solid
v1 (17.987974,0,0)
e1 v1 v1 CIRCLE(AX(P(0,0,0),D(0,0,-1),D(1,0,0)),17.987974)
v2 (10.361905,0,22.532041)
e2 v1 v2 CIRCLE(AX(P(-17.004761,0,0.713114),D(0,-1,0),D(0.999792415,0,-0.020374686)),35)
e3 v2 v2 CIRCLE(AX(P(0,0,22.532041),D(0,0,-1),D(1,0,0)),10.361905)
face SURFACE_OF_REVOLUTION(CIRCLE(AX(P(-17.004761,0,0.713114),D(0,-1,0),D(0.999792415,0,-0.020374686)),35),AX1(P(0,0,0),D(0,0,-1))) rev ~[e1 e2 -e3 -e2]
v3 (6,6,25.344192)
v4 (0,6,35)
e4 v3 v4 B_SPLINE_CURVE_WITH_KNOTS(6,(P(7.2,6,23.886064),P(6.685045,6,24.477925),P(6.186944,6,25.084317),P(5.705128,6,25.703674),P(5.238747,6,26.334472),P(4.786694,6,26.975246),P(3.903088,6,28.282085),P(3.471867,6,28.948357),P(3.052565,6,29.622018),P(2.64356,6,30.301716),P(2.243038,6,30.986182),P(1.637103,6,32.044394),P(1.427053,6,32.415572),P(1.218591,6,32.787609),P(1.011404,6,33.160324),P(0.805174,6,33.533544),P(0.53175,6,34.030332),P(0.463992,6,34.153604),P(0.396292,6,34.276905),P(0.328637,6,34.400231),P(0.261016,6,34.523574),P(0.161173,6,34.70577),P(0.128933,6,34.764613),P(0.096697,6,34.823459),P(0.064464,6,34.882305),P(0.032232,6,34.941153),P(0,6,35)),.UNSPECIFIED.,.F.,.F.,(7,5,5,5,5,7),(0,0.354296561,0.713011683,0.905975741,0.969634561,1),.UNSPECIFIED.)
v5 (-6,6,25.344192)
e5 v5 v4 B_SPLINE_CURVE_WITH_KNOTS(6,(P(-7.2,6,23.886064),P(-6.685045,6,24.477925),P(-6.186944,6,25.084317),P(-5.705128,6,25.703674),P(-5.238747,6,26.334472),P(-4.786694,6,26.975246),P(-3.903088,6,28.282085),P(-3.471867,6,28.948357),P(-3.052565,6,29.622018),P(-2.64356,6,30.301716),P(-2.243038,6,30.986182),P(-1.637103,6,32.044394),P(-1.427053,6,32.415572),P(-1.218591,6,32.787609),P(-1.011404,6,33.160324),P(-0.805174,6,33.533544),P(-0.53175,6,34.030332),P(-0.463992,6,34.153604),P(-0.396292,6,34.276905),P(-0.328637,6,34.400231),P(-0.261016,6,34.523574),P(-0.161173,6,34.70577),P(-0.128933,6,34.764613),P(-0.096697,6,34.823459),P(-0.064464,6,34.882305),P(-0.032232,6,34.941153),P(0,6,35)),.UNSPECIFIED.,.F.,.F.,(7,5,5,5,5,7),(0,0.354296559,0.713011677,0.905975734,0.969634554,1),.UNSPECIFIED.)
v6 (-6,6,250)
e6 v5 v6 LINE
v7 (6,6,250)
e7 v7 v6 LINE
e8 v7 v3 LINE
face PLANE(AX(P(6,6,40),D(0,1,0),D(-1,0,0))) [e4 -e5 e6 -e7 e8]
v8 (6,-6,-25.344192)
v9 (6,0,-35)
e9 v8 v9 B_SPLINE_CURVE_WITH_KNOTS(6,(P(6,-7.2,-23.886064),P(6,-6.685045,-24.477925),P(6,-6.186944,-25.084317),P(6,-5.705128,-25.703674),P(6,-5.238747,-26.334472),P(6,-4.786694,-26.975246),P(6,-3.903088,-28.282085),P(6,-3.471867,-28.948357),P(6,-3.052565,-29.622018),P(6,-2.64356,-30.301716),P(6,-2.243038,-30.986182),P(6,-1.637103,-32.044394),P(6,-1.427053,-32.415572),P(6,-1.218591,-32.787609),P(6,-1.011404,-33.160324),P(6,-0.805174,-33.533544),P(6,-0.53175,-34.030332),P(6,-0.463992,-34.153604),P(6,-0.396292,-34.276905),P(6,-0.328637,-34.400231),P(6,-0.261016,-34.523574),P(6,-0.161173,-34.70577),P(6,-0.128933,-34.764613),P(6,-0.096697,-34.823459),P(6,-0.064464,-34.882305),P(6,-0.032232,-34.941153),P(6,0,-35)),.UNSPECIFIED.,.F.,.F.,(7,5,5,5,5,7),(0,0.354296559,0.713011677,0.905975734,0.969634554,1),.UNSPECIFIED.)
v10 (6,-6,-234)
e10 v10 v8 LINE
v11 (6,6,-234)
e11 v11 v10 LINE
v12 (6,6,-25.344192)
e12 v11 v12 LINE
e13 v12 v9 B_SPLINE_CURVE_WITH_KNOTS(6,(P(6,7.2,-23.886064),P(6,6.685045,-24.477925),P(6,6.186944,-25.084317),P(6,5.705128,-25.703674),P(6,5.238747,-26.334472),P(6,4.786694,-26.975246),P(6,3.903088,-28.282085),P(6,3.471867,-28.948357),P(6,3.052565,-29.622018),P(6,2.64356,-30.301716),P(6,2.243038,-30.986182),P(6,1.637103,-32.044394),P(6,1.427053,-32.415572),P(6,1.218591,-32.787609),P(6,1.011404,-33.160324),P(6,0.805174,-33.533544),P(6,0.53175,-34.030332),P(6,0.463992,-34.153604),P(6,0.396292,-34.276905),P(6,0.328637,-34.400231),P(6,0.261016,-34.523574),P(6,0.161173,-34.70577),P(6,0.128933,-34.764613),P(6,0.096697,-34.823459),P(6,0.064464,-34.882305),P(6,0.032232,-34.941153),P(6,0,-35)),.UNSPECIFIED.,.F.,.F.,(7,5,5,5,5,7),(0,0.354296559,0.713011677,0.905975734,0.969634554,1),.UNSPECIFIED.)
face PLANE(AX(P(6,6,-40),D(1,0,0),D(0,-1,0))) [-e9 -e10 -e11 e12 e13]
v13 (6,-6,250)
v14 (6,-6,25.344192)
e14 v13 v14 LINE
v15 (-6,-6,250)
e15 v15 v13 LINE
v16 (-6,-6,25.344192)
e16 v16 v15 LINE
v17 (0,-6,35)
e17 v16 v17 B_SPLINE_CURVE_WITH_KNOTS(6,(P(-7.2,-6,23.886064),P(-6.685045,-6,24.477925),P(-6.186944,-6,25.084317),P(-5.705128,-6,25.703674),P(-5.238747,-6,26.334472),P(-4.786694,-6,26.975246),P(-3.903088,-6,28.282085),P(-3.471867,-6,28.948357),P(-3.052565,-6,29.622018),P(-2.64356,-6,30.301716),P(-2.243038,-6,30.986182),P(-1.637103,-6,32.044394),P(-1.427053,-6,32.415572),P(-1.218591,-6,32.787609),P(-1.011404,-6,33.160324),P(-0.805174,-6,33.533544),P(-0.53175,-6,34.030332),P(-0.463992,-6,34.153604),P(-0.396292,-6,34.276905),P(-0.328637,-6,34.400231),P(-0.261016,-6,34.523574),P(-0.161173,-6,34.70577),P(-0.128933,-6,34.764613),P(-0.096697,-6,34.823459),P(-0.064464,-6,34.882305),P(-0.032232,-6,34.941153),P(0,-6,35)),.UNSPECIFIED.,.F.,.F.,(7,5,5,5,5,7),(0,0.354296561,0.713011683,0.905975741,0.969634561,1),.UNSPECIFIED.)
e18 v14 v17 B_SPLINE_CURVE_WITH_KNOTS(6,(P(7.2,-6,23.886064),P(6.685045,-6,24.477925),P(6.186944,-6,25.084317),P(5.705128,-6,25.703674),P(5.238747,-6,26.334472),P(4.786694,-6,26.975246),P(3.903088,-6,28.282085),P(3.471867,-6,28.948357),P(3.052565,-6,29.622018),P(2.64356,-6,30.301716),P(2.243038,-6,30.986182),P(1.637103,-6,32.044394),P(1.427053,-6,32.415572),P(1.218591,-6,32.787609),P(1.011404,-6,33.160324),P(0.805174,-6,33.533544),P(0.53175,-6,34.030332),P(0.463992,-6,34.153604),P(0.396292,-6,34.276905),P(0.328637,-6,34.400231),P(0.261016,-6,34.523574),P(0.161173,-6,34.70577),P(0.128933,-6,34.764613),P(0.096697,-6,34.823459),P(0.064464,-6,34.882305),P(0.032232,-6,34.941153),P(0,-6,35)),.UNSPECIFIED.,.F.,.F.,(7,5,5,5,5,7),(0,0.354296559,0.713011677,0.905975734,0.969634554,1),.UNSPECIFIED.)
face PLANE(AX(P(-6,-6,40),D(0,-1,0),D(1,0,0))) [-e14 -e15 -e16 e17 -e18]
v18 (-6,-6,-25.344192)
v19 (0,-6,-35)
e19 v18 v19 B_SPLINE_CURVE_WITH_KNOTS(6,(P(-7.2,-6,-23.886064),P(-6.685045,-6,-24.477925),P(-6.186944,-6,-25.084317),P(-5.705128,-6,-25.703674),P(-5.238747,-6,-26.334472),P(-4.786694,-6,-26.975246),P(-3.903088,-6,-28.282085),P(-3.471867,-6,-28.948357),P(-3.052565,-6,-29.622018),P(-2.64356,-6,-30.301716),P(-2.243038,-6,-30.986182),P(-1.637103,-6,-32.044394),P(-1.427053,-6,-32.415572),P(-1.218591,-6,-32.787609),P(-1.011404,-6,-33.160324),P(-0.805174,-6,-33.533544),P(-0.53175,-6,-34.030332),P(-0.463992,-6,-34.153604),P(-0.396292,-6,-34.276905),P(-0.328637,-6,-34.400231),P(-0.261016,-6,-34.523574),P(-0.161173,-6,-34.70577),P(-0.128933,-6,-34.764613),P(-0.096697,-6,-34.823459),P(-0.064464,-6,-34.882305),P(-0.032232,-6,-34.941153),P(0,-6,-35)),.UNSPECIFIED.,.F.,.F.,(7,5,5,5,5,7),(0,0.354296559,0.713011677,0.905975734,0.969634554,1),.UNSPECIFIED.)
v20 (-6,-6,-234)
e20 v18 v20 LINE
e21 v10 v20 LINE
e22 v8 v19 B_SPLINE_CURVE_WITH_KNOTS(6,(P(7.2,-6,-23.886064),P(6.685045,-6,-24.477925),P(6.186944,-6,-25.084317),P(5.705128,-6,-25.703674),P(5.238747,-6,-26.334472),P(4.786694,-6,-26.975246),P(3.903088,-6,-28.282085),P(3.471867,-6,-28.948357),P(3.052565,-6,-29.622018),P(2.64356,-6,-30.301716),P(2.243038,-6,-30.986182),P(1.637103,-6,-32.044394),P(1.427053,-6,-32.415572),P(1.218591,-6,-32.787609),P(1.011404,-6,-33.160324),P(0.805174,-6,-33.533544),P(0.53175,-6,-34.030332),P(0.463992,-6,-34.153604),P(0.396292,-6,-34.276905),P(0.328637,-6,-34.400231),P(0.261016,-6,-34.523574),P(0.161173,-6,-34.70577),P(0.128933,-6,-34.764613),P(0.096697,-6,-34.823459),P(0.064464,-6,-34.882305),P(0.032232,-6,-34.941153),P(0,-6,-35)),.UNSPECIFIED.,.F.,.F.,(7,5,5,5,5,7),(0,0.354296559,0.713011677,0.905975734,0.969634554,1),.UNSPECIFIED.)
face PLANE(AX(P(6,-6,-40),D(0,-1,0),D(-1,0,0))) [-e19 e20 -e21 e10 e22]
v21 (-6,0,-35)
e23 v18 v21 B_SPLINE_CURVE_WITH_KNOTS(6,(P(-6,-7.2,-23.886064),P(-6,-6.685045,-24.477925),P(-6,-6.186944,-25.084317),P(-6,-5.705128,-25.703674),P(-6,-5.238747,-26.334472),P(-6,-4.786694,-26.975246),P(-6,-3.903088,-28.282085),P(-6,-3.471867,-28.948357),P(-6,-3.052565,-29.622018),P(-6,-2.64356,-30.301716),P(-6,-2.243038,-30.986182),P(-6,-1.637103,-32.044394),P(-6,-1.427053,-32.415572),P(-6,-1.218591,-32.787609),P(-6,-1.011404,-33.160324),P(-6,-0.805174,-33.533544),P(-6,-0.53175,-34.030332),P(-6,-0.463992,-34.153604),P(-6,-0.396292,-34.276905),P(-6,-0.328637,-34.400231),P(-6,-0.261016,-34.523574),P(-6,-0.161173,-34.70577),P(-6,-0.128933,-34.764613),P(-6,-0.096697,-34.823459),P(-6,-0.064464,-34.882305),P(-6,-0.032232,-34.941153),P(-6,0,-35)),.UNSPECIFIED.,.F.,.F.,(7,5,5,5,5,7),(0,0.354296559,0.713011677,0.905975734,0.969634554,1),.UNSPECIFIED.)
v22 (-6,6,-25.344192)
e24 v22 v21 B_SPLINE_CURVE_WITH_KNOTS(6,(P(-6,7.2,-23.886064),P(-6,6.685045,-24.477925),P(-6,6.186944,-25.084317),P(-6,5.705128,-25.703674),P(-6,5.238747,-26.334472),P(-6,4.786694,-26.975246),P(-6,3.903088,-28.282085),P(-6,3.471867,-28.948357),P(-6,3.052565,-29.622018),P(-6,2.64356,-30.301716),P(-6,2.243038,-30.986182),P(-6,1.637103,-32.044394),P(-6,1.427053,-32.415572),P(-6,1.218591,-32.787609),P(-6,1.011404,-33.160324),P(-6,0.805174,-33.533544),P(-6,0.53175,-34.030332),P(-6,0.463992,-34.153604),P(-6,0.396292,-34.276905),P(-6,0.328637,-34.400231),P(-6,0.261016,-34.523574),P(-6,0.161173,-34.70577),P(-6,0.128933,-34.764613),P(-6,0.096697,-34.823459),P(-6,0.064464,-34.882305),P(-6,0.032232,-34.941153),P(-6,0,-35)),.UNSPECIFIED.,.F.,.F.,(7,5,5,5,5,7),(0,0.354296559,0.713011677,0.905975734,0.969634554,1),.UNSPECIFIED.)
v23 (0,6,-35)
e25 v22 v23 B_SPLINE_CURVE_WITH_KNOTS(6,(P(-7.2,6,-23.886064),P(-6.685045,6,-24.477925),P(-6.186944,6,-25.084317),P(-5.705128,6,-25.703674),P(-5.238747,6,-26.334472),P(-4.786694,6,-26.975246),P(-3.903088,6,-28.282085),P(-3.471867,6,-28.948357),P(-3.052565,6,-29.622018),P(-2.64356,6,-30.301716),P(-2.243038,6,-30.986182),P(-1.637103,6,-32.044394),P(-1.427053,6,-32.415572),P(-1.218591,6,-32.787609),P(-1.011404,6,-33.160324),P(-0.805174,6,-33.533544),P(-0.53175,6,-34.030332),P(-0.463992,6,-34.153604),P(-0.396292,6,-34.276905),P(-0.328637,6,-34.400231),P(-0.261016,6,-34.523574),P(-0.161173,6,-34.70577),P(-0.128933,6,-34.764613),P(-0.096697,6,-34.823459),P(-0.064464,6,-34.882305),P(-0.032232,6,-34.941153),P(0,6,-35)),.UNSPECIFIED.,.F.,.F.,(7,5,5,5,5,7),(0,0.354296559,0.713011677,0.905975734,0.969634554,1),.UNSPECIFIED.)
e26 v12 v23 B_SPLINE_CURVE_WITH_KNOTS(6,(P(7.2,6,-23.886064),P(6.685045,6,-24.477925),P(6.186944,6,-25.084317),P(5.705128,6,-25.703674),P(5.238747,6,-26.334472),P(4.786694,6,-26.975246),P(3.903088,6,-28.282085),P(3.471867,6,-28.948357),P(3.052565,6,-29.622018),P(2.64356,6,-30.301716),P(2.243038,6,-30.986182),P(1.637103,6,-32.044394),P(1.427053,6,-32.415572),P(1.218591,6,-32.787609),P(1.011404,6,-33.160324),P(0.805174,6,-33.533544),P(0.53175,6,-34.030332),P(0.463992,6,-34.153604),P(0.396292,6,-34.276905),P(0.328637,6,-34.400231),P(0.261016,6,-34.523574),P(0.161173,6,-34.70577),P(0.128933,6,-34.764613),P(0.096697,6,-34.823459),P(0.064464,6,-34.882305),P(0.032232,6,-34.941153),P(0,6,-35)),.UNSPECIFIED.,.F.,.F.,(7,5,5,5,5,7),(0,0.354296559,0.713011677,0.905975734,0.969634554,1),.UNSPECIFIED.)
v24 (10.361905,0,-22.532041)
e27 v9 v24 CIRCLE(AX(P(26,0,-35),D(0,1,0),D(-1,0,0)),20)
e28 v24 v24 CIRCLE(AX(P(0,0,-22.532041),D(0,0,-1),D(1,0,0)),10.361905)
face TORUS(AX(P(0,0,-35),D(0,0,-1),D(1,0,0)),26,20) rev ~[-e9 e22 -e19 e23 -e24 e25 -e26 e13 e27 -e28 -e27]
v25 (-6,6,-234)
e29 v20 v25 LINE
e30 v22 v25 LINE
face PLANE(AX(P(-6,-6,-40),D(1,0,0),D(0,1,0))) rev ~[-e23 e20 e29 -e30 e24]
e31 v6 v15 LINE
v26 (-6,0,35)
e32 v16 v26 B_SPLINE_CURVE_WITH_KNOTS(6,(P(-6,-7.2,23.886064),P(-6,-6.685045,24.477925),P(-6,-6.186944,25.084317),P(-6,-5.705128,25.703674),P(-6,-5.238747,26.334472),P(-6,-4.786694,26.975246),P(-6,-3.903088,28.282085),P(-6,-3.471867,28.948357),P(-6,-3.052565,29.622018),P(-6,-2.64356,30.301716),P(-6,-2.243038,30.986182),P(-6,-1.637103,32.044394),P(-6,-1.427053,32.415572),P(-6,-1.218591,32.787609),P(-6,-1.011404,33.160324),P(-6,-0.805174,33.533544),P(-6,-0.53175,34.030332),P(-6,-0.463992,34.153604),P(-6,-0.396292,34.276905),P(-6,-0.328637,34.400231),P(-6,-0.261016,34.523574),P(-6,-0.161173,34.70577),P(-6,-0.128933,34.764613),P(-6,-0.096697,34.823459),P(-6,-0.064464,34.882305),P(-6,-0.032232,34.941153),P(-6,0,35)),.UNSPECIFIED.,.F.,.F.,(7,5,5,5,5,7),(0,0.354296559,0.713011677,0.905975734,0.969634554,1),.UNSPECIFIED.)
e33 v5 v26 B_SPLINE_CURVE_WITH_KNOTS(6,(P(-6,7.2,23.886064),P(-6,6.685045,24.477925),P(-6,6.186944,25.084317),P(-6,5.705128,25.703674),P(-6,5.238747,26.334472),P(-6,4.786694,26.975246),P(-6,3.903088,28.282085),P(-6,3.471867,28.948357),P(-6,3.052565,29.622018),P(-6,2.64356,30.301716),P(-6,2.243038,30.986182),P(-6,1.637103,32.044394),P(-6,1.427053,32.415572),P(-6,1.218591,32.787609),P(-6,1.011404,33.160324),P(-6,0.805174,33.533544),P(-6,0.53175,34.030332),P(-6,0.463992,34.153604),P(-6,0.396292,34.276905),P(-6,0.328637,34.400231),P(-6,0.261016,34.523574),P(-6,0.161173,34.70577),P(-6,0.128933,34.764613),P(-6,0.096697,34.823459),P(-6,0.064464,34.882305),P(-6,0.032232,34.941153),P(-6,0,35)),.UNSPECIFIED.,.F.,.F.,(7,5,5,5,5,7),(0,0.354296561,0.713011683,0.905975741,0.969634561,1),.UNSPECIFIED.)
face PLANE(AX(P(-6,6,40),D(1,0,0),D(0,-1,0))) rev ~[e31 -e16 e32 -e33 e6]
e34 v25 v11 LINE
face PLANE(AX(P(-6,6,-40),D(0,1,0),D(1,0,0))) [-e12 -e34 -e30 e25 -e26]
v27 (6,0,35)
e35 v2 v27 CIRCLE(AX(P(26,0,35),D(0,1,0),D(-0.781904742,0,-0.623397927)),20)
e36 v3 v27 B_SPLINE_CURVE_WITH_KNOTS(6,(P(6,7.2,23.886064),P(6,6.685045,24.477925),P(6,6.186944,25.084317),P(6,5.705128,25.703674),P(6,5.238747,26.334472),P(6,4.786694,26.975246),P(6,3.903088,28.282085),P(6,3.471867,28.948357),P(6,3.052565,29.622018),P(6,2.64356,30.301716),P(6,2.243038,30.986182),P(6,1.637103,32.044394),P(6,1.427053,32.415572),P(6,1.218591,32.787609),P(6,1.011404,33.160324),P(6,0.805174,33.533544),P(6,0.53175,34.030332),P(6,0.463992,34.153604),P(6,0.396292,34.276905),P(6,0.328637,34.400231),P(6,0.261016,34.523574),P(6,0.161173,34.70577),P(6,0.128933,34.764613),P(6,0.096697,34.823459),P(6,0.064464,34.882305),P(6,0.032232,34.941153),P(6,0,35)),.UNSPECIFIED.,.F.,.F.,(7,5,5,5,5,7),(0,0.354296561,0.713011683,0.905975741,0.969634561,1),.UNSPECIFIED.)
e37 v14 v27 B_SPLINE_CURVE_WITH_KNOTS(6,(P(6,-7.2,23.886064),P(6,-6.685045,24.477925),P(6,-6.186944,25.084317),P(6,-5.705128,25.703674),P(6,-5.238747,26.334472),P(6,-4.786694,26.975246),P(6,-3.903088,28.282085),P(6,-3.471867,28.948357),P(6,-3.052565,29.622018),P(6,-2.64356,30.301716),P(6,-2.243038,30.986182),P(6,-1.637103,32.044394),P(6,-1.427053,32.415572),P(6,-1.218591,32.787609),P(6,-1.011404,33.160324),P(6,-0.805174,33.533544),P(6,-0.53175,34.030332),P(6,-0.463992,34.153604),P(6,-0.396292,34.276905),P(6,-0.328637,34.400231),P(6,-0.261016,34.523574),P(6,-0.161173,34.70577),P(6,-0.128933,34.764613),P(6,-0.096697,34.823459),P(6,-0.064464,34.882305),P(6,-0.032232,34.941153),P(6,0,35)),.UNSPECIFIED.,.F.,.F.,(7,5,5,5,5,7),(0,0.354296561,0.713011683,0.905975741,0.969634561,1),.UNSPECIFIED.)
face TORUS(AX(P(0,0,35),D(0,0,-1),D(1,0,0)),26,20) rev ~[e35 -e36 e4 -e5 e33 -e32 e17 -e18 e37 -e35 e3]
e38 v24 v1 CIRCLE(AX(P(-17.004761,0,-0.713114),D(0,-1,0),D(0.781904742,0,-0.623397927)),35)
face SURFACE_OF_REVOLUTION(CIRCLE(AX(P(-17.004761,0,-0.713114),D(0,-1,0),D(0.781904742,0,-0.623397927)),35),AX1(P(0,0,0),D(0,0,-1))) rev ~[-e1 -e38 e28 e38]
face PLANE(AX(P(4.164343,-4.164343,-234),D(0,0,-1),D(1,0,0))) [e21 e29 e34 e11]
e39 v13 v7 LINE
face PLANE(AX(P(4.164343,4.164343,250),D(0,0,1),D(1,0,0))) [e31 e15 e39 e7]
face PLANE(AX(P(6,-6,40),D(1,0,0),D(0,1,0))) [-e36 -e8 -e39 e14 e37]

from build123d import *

# Parameters (mm, degrees)
F3_DEPTH      = 210
F3_DEPTH_BACK = 25
F5_DEPTH      = 194
F5_DEPTH_BACK = 25


with BuildPart() as f1:
    # F0 (on Front) → F1 (revolve)
    with BuildSketch(Plane.XZ):
        with BuildLine():
            Line((6, 40), (0, 40))
            Line((0, 40), (0, -40))
            Line((0, -40), (6, -40))
            Line((6, -40), (6, -35))
            ThreePointArc((6, -35), (7.121945325, -28.3955279025), (10.3619051686, -22.5320414644))
            ThreePointArc((10.3619051686, -22.5320414644), (16.1478700246, -11.9337677658), (17.9879737223, 0))
            ThreePointArc((17.9879737223, 0), (16.1478700246, 11.9337677658), (10.3619051686, 22.5320414644))
            ThreePointArc((10.3619051686, 22.5320414644), (7.121945325, 28.3955279025), (6, 35))
            Line((6, 35), (6, 40))
        make_face()
    revolve(axis=Axis((0, 0, 0), (0, 0, -1)))

    # F2 (on face) → F3 (join, two sides)
    with BuildSketch(Plane.XY.offset(40)) as f3_sk:
        with BuildLine():
            Line((6, 0), (6, 6))
            Line((6, 6), (0, 6))
            ThreePointArc((0, 6), (4.2426406871, 4.2426406871), (6, 0))
        make_face()
        with BuildLine():
            ThreePointArc((-6, 0), (-4.2426406871, 4.2426406871), (0, 6))
            Line((0, 6), (-6, 6))
            Line((-6, 6), (-6, 0))
        make_face()
        with BuildLine():
            ThreePointArc((0, -6), (-4.2426406871, -4.2426406871), (-6, 0))
            Line((-6, 0), (-6, -6))
            Line((-6, -6), (0, -6))
        make_face()
        with BuildLine():
            Line((6, -6), (6, 0))
            ThreePointArc((6, 0), (4.2426406871, -4.2426406871), (0, -6))
            Line((0, -6), (6, -6))
        make_face()
        with BuildLine():
            ThreePointArc((6, 0), (4.2426406871, 4.2426406871), (0, 6))
            ThreePointArc((0, 6), (-4.2426406871, 4.2426406871), (-6, 0))
            ThreePointArc((-6, 0), (-4.2426406871, -4.2426406871), (0, -6))
            ThreePointArc((0, -6), (4.2426406871, -4.2426406871), (6, 0))
        make_face()
    extrude(amount=F3_DEPTH)
    extrude(f3_sk.sketch, amount=-F3_DEPTH_BACK)

    # F4 (on face) → F5 (join, two sides)
    with BuildSketch(Plane(origin=(0, 0, -40), x_dir=(1, 0, 0), z_dir=(0, 0, -1))) as f5_sk:
        with BuildLine():
            Line((6, 0), (6, 6))
            Line((6, 6), (0, 6))
            ThreePointArc((0, 6), (4.2426406871, 4.2426406871), (6, 0))
        make_face()
        with BuildLine():
            ThreePointArc((-6, 0), (-4.2426406871, 4.2426406871), (0, 6))
            Line((0, 6), (-6, 6))
            Line((-6, 6), (-6, 0))
        make_face()
        with BuildLine():
            ThreePointArc((6, 0), (4.2426406871, 4.2426406871), (0, 6))
            ThreePointArc((0, 6), (-4.2426406871, 4.2426406871), (-6, 0))
            ThreePointArc((-6, 0), (-4.2426406871, -4.2426406871), (0, -6))
            ThreePointArc((0, -6), (4.2426406871, -4.2426406871), (6, 0))
        make_face()
        with BuildLine():
            Line((6, -6), (6, 0))
            ThreePointArc((6, 0), (4.2426406871, -4.2426406871), (0, -6))
            Line((0, -6), (6, -6))
        make_face()
        with BuildLine():
            ThreePointArc((0, -6), (-4.2426406871, -4.2426406871), (-6, 0))
            Line((-6, 0), (-6, -6))
            Line((-6, -6), (0, -6))
        make_face()
    extrude(amount=F5_DEPTH)
    extrude(f5_sk.sketch, amount=-F5_DEPTH_BACK)


solid = f1.part
